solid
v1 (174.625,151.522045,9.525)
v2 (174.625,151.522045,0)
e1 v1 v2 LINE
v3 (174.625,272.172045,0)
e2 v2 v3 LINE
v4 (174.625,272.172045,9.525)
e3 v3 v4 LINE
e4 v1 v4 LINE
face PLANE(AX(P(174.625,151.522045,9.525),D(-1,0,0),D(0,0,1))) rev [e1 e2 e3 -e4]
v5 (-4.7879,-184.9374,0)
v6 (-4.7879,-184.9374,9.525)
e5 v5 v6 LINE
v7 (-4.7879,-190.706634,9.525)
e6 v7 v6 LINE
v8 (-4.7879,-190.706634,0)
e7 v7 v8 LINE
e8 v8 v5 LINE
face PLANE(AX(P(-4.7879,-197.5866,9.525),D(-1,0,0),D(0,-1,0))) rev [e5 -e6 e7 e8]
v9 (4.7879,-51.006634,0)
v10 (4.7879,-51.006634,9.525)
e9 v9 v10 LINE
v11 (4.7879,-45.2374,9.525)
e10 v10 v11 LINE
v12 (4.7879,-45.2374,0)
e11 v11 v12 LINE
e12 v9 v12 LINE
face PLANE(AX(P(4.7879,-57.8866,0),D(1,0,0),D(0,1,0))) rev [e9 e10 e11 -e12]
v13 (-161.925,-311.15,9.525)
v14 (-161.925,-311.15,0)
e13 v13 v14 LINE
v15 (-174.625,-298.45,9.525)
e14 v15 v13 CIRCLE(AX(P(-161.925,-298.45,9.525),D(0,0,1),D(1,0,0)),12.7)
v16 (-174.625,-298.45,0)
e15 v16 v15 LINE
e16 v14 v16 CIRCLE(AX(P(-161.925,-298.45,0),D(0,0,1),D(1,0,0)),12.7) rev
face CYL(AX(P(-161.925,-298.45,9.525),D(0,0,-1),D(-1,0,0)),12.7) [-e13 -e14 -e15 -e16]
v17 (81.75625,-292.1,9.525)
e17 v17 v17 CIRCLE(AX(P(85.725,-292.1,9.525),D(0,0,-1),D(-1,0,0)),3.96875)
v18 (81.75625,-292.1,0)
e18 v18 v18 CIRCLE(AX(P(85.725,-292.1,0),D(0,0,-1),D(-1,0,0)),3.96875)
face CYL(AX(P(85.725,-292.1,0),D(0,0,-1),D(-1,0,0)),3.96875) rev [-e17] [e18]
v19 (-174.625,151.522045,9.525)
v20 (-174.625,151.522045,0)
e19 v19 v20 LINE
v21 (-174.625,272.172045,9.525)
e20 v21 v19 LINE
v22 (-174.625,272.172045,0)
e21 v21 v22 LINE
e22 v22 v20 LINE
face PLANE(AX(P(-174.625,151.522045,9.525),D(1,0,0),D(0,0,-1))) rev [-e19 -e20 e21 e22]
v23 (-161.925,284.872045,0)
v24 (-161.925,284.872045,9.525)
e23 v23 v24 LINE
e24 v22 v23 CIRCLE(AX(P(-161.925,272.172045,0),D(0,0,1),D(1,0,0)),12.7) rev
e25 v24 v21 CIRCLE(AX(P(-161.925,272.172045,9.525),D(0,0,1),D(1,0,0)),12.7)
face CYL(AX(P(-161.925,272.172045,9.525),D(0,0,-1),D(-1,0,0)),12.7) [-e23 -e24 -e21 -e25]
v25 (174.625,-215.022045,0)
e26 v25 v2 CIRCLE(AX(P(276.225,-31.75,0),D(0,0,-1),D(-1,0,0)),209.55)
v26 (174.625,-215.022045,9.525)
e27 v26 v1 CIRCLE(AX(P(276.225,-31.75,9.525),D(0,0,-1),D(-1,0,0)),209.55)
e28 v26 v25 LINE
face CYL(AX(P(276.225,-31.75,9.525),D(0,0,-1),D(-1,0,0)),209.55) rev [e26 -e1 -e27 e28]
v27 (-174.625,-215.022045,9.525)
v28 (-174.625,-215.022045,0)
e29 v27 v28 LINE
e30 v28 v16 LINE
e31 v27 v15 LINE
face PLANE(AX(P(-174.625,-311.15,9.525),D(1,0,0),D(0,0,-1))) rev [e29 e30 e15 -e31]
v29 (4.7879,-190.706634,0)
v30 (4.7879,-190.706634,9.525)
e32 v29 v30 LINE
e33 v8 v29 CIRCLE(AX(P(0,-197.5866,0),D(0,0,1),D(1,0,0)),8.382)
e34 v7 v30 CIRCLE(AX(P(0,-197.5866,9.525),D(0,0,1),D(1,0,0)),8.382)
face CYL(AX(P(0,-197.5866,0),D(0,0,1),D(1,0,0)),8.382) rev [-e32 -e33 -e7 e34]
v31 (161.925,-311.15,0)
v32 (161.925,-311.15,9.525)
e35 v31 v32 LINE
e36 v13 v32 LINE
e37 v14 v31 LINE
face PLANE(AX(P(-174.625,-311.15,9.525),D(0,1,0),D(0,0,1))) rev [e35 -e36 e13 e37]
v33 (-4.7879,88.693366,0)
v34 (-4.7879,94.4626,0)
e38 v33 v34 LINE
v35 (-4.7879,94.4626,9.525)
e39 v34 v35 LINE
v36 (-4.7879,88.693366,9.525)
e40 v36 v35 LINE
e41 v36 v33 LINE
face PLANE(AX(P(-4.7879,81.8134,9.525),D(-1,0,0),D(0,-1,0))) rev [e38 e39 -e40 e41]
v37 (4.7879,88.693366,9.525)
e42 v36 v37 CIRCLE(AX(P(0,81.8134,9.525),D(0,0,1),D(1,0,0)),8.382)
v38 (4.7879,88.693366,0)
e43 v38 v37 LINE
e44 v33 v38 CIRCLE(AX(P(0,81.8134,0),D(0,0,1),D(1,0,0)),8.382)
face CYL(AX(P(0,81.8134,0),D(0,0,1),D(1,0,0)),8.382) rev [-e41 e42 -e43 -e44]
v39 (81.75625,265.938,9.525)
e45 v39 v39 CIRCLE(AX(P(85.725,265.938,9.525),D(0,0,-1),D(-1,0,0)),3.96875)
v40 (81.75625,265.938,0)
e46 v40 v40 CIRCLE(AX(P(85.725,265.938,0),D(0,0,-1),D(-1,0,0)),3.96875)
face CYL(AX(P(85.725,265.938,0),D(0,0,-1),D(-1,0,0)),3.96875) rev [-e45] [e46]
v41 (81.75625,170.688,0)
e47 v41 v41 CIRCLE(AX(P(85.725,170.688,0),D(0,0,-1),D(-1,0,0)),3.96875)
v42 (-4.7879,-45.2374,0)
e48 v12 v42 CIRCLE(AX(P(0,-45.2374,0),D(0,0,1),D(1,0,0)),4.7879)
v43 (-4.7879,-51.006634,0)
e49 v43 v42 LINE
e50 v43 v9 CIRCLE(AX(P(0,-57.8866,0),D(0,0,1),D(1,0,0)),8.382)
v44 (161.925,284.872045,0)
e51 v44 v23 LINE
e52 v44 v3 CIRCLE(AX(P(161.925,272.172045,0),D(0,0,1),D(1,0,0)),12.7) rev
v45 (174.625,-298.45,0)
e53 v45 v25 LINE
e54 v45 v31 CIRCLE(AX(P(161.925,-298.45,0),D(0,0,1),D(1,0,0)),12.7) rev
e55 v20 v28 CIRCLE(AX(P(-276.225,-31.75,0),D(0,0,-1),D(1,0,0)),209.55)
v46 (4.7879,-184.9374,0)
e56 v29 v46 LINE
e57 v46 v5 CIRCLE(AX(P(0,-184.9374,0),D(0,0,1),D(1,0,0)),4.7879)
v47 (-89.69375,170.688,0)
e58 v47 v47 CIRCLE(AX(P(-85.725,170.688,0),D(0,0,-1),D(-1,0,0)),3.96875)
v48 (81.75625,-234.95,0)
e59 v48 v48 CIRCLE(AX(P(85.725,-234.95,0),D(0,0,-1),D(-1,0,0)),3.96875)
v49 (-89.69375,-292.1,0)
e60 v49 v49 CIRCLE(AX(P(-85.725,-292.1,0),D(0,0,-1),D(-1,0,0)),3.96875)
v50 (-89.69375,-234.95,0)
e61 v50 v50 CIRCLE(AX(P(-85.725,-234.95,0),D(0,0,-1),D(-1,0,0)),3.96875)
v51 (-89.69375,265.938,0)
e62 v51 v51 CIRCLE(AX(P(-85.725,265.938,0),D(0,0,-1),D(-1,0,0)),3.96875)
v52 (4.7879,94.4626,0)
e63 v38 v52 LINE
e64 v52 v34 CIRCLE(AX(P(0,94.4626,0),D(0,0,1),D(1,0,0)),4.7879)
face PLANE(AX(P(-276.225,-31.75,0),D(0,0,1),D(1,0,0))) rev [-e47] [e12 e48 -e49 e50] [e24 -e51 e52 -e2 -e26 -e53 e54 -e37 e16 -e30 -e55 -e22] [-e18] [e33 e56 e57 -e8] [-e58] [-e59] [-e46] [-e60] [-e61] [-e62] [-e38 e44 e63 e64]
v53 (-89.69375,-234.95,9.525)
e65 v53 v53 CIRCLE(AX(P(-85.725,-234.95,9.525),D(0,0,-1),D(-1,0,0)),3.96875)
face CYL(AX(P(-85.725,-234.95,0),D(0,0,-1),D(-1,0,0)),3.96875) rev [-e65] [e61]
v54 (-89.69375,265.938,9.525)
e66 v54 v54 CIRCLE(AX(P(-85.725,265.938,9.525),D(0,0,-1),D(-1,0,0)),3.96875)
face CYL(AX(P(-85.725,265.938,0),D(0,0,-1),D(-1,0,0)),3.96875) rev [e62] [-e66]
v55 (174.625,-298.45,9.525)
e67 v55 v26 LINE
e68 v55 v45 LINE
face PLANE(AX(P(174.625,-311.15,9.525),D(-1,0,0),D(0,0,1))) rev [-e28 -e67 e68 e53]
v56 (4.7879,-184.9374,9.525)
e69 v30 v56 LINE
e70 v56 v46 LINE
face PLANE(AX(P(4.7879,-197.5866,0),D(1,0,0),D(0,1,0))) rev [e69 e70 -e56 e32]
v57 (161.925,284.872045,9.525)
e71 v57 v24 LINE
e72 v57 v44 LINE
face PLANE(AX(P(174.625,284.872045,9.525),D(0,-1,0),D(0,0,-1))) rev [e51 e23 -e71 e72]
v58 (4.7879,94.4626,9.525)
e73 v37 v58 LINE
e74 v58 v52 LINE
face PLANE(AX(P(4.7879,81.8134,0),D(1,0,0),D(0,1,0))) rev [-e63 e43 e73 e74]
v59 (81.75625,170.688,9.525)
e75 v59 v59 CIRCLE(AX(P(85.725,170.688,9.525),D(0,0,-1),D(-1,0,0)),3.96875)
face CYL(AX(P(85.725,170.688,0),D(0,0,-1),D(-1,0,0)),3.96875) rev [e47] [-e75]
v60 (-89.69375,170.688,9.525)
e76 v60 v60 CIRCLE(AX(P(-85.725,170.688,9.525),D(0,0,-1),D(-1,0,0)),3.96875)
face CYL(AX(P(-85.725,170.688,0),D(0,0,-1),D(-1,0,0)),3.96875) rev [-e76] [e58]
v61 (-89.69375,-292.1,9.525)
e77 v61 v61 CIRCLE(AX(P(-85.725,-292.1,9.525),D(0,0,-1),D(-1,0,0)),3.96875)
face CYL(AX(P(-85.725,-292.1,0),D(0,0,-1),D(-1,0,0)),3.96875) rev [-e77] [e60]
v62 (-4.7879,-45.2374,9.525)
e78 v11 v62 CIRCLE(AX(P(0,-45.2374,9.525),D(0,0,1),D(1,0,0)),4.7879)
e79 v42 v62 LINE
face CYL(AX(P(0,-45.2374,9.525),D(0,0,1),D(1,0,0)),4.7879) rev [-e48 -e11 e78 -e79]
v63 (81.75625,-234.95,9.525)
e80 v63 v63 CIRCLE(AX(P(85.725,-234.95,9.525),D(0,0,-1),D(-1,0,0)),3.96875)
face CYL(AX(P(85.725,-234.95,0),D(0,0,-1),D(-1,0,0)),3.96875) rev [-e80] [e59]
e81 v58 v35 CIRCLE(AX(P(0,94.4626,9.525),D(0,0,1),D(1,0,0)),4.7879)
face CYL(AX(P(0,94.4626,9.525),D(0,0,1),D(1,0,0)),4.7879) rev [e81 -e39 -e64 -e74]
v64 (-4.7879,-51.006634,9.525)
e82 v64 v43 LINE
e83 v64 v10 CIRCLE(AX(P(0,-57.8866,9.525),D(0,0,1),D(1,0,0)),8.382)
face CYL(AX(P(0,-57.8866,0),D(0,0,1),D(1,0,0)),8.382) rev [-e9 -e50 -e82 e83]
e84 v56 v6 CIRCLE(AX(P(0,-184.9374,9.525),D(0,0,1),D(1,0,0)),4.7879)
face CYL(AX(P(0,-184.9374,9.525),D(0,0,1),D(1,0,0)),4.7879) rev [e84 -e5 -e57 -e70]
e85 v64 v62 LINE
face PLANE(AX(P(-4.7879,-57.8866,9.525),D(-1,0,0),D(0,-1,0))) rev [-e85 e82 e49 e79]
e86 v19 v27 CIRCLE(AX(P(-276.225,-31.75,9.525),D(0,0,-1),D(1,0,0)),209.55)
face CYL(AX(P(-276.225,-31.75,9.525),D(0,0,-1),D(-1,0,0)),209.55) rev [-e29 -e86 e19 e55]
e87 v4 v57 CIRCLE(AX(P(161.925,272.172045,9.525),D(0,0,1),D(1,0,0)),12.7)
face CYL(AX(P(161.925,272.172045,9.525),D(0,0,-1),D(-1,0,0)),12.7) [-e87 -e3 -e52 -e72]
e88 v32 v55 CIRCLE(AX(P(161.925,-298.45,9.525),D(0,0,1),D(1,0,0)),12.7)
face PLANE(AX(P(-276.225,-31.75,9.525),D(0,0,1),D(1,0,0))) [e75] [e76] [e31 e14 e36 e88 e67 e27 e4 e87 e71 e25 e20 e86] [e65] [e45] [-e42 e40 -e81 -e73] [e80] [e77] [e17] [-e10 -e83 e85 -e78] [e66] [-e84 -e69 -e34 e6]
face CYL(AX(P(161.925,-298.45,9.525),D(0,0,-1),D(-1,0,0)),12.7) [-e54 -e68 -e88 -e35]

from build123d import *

# Parameters (mm, degrees)
BOSS_EXTRUDE1_DEPTH            = 9.525
V_0_377_DIAMETER_SLOT1_DEPTH   = 9.525
FILLET1_R                      = 12.7
SKETCH6_R                      = 8.382
CUT_EXTRUDE1_DEPTH             = 357.929879318
F_5_16_0_3125_DIAMETER_HOLE1_D = 7.9375
SKETCH14_W                     = 349.25
SKETCH14_H                     = 26.277954941
CUT_EXTRUDE3_DEPTH             = 357.929879318
FILLET2_R                      = 12.7


# Read off the part's stored shape, not the designer's step: V (0.377) Diameter Slot1
with BuildPart() as part:
    # Sketch1 → Boss-Extrude1 (new body)
    with BuildSketch(Plane.XY):
        with BuildLine():
            Line((-174.625, 151.522045059), (-174.625, 311.15))
            Line((-174.625, 311.15), (174.625, 311.15))
            Line((174.625, 311.15), (174.625, 151.522045059))
            ThreePointArc((174.625, 151.522045059), (66.675, -31.75), (174.625, -215.022045059))
            Line((174.625, -215.022045059), (174.625, -311.15))
            Line((174.625, -311.15), (-174.625, -311.15))
            Line((-174.625, -311.15), (-174.625, -215.022045059))
            ThreePointArc((-174.625, -215.022045059), (-66.675, -31.75), (-174.625, 151.522045059))
        make_face()
    extrude(amount=BOSS_EXTRUDE1_DEPTH)

    # V (0.377) Diameter Slot1 outline → V (0.377) Diameter Slot1 (cut)
    with BuildSketch(Plane.XY):
        with BuildLine():
            Line((4.7879, -57.8866), (4.7879, -45.2374))
            ThreePointArc((4.7879, -45.2374), (0, -40.4495), (-4.7879, -45.2374))
            Line((-4.7879, -45.2374), (-4.7879, -57.8866))
            ThreePointArc((-4.7879, -57.8866), (0, -62.6745), (4.7879, -57.8866))
        make_face()
        with BuildLine():
            ThreePointArc((4.7879, 94.4626), (0, 99.2505), (-4.7879, 94.4626))
            Line((-4.7879, 94.4626), (-4.7879, 81.8134))
            ThreePointArc((-4.7879, 81.8134), (0, 77.0255), (4.7879, 81.8134))
            Line((4.7879, 81.8134), (4.7879, 94.4626))
        make_face()
        with BuildLine():
            ThreePointArc((4.7879, -184.9374), (0, -180.1495), (-4.7879, -184.9374))
            Line((-4.7879, -184.9374), (-4.7879, -197.5866))
            ThreePointArc((-4.7879, -197.5866), (0, -202.3745), (4.7879, -197.5866))
            Line((4.7879, -197.5866), (4.7879, -184.9374))
        make_face()
    extrude(amount=V_0_377_DIAMETER_SLOT1_DEPTH, mode=Mode.SUBTRACT)

    # Fillet1
    fillet1_edges = [part.edges().sort_by_distance(p)[0] for p in [
        (174.625, -311.15, 4.7625),
        (-174.625, -311.15, 4.7625),
    ]]
    fillet(fillet1_edges, radius=FILLET1_R)

    # Sketch6 → Cut-Extrude1 (cut, through all)
    with BuildSketch(Plane.XY.offset(9.525)):
        with Locations((0, -197.5866)):
            Circle(SKETCH6_R)
        with Locations((0, 81.8134)):
            Circle(SKETCH6_R)
        with Locations((0, -57.8866)):
            Circle(SKETCH6_R)
    extrude(amount=-CUT_EXTRUDE1_DEPTH, mode=Mode.SUBTRACT)

    # 5/16 (0.3125) Diameter Hole1 (through all)
    with Locations(Plane(origin=(0, 0, 0), x_dir=(-1, 0, 0), z_dir=(0, 0, -1))):
        with Locations((-85.725, 265.938), (85.725, 170.688), (85.725, 265.938), (-85.725, 170.688), (85.725, -234.95), (85.725, -292.1), (-85.725, -292.1), (-85.725, -234.95)):
            Hole(F_5_16_0_3125_DIAMETER_HOLE1_D / 2)

    # Sketch14 → Cut-Extrude3 (cut, through all)
    with BuildSketch(Plane(origin=(0, 0, 0), x_dir=(-1, 0, 0), z_dir=(0, 0, -1))):
        with Locations((0, 298.011022529)):
            Rectangle(SKETCH14_W, SKETCH14_H)
    extrude(amount=-CUT_EXTRUDE3_DEPTH, mode=Mode.SUBTRACT)

    # Fillet2
    fillet2_edges = [part.edges().sort_by_distance(p)[0] for p in [
        (174.625, 284.872045059, 4.7625),
        (-174.625, 284.872045059, 4.7625),
    ]]
    fillet(fillet2_edges, radius=FILLET2_R)


solid = part.part
